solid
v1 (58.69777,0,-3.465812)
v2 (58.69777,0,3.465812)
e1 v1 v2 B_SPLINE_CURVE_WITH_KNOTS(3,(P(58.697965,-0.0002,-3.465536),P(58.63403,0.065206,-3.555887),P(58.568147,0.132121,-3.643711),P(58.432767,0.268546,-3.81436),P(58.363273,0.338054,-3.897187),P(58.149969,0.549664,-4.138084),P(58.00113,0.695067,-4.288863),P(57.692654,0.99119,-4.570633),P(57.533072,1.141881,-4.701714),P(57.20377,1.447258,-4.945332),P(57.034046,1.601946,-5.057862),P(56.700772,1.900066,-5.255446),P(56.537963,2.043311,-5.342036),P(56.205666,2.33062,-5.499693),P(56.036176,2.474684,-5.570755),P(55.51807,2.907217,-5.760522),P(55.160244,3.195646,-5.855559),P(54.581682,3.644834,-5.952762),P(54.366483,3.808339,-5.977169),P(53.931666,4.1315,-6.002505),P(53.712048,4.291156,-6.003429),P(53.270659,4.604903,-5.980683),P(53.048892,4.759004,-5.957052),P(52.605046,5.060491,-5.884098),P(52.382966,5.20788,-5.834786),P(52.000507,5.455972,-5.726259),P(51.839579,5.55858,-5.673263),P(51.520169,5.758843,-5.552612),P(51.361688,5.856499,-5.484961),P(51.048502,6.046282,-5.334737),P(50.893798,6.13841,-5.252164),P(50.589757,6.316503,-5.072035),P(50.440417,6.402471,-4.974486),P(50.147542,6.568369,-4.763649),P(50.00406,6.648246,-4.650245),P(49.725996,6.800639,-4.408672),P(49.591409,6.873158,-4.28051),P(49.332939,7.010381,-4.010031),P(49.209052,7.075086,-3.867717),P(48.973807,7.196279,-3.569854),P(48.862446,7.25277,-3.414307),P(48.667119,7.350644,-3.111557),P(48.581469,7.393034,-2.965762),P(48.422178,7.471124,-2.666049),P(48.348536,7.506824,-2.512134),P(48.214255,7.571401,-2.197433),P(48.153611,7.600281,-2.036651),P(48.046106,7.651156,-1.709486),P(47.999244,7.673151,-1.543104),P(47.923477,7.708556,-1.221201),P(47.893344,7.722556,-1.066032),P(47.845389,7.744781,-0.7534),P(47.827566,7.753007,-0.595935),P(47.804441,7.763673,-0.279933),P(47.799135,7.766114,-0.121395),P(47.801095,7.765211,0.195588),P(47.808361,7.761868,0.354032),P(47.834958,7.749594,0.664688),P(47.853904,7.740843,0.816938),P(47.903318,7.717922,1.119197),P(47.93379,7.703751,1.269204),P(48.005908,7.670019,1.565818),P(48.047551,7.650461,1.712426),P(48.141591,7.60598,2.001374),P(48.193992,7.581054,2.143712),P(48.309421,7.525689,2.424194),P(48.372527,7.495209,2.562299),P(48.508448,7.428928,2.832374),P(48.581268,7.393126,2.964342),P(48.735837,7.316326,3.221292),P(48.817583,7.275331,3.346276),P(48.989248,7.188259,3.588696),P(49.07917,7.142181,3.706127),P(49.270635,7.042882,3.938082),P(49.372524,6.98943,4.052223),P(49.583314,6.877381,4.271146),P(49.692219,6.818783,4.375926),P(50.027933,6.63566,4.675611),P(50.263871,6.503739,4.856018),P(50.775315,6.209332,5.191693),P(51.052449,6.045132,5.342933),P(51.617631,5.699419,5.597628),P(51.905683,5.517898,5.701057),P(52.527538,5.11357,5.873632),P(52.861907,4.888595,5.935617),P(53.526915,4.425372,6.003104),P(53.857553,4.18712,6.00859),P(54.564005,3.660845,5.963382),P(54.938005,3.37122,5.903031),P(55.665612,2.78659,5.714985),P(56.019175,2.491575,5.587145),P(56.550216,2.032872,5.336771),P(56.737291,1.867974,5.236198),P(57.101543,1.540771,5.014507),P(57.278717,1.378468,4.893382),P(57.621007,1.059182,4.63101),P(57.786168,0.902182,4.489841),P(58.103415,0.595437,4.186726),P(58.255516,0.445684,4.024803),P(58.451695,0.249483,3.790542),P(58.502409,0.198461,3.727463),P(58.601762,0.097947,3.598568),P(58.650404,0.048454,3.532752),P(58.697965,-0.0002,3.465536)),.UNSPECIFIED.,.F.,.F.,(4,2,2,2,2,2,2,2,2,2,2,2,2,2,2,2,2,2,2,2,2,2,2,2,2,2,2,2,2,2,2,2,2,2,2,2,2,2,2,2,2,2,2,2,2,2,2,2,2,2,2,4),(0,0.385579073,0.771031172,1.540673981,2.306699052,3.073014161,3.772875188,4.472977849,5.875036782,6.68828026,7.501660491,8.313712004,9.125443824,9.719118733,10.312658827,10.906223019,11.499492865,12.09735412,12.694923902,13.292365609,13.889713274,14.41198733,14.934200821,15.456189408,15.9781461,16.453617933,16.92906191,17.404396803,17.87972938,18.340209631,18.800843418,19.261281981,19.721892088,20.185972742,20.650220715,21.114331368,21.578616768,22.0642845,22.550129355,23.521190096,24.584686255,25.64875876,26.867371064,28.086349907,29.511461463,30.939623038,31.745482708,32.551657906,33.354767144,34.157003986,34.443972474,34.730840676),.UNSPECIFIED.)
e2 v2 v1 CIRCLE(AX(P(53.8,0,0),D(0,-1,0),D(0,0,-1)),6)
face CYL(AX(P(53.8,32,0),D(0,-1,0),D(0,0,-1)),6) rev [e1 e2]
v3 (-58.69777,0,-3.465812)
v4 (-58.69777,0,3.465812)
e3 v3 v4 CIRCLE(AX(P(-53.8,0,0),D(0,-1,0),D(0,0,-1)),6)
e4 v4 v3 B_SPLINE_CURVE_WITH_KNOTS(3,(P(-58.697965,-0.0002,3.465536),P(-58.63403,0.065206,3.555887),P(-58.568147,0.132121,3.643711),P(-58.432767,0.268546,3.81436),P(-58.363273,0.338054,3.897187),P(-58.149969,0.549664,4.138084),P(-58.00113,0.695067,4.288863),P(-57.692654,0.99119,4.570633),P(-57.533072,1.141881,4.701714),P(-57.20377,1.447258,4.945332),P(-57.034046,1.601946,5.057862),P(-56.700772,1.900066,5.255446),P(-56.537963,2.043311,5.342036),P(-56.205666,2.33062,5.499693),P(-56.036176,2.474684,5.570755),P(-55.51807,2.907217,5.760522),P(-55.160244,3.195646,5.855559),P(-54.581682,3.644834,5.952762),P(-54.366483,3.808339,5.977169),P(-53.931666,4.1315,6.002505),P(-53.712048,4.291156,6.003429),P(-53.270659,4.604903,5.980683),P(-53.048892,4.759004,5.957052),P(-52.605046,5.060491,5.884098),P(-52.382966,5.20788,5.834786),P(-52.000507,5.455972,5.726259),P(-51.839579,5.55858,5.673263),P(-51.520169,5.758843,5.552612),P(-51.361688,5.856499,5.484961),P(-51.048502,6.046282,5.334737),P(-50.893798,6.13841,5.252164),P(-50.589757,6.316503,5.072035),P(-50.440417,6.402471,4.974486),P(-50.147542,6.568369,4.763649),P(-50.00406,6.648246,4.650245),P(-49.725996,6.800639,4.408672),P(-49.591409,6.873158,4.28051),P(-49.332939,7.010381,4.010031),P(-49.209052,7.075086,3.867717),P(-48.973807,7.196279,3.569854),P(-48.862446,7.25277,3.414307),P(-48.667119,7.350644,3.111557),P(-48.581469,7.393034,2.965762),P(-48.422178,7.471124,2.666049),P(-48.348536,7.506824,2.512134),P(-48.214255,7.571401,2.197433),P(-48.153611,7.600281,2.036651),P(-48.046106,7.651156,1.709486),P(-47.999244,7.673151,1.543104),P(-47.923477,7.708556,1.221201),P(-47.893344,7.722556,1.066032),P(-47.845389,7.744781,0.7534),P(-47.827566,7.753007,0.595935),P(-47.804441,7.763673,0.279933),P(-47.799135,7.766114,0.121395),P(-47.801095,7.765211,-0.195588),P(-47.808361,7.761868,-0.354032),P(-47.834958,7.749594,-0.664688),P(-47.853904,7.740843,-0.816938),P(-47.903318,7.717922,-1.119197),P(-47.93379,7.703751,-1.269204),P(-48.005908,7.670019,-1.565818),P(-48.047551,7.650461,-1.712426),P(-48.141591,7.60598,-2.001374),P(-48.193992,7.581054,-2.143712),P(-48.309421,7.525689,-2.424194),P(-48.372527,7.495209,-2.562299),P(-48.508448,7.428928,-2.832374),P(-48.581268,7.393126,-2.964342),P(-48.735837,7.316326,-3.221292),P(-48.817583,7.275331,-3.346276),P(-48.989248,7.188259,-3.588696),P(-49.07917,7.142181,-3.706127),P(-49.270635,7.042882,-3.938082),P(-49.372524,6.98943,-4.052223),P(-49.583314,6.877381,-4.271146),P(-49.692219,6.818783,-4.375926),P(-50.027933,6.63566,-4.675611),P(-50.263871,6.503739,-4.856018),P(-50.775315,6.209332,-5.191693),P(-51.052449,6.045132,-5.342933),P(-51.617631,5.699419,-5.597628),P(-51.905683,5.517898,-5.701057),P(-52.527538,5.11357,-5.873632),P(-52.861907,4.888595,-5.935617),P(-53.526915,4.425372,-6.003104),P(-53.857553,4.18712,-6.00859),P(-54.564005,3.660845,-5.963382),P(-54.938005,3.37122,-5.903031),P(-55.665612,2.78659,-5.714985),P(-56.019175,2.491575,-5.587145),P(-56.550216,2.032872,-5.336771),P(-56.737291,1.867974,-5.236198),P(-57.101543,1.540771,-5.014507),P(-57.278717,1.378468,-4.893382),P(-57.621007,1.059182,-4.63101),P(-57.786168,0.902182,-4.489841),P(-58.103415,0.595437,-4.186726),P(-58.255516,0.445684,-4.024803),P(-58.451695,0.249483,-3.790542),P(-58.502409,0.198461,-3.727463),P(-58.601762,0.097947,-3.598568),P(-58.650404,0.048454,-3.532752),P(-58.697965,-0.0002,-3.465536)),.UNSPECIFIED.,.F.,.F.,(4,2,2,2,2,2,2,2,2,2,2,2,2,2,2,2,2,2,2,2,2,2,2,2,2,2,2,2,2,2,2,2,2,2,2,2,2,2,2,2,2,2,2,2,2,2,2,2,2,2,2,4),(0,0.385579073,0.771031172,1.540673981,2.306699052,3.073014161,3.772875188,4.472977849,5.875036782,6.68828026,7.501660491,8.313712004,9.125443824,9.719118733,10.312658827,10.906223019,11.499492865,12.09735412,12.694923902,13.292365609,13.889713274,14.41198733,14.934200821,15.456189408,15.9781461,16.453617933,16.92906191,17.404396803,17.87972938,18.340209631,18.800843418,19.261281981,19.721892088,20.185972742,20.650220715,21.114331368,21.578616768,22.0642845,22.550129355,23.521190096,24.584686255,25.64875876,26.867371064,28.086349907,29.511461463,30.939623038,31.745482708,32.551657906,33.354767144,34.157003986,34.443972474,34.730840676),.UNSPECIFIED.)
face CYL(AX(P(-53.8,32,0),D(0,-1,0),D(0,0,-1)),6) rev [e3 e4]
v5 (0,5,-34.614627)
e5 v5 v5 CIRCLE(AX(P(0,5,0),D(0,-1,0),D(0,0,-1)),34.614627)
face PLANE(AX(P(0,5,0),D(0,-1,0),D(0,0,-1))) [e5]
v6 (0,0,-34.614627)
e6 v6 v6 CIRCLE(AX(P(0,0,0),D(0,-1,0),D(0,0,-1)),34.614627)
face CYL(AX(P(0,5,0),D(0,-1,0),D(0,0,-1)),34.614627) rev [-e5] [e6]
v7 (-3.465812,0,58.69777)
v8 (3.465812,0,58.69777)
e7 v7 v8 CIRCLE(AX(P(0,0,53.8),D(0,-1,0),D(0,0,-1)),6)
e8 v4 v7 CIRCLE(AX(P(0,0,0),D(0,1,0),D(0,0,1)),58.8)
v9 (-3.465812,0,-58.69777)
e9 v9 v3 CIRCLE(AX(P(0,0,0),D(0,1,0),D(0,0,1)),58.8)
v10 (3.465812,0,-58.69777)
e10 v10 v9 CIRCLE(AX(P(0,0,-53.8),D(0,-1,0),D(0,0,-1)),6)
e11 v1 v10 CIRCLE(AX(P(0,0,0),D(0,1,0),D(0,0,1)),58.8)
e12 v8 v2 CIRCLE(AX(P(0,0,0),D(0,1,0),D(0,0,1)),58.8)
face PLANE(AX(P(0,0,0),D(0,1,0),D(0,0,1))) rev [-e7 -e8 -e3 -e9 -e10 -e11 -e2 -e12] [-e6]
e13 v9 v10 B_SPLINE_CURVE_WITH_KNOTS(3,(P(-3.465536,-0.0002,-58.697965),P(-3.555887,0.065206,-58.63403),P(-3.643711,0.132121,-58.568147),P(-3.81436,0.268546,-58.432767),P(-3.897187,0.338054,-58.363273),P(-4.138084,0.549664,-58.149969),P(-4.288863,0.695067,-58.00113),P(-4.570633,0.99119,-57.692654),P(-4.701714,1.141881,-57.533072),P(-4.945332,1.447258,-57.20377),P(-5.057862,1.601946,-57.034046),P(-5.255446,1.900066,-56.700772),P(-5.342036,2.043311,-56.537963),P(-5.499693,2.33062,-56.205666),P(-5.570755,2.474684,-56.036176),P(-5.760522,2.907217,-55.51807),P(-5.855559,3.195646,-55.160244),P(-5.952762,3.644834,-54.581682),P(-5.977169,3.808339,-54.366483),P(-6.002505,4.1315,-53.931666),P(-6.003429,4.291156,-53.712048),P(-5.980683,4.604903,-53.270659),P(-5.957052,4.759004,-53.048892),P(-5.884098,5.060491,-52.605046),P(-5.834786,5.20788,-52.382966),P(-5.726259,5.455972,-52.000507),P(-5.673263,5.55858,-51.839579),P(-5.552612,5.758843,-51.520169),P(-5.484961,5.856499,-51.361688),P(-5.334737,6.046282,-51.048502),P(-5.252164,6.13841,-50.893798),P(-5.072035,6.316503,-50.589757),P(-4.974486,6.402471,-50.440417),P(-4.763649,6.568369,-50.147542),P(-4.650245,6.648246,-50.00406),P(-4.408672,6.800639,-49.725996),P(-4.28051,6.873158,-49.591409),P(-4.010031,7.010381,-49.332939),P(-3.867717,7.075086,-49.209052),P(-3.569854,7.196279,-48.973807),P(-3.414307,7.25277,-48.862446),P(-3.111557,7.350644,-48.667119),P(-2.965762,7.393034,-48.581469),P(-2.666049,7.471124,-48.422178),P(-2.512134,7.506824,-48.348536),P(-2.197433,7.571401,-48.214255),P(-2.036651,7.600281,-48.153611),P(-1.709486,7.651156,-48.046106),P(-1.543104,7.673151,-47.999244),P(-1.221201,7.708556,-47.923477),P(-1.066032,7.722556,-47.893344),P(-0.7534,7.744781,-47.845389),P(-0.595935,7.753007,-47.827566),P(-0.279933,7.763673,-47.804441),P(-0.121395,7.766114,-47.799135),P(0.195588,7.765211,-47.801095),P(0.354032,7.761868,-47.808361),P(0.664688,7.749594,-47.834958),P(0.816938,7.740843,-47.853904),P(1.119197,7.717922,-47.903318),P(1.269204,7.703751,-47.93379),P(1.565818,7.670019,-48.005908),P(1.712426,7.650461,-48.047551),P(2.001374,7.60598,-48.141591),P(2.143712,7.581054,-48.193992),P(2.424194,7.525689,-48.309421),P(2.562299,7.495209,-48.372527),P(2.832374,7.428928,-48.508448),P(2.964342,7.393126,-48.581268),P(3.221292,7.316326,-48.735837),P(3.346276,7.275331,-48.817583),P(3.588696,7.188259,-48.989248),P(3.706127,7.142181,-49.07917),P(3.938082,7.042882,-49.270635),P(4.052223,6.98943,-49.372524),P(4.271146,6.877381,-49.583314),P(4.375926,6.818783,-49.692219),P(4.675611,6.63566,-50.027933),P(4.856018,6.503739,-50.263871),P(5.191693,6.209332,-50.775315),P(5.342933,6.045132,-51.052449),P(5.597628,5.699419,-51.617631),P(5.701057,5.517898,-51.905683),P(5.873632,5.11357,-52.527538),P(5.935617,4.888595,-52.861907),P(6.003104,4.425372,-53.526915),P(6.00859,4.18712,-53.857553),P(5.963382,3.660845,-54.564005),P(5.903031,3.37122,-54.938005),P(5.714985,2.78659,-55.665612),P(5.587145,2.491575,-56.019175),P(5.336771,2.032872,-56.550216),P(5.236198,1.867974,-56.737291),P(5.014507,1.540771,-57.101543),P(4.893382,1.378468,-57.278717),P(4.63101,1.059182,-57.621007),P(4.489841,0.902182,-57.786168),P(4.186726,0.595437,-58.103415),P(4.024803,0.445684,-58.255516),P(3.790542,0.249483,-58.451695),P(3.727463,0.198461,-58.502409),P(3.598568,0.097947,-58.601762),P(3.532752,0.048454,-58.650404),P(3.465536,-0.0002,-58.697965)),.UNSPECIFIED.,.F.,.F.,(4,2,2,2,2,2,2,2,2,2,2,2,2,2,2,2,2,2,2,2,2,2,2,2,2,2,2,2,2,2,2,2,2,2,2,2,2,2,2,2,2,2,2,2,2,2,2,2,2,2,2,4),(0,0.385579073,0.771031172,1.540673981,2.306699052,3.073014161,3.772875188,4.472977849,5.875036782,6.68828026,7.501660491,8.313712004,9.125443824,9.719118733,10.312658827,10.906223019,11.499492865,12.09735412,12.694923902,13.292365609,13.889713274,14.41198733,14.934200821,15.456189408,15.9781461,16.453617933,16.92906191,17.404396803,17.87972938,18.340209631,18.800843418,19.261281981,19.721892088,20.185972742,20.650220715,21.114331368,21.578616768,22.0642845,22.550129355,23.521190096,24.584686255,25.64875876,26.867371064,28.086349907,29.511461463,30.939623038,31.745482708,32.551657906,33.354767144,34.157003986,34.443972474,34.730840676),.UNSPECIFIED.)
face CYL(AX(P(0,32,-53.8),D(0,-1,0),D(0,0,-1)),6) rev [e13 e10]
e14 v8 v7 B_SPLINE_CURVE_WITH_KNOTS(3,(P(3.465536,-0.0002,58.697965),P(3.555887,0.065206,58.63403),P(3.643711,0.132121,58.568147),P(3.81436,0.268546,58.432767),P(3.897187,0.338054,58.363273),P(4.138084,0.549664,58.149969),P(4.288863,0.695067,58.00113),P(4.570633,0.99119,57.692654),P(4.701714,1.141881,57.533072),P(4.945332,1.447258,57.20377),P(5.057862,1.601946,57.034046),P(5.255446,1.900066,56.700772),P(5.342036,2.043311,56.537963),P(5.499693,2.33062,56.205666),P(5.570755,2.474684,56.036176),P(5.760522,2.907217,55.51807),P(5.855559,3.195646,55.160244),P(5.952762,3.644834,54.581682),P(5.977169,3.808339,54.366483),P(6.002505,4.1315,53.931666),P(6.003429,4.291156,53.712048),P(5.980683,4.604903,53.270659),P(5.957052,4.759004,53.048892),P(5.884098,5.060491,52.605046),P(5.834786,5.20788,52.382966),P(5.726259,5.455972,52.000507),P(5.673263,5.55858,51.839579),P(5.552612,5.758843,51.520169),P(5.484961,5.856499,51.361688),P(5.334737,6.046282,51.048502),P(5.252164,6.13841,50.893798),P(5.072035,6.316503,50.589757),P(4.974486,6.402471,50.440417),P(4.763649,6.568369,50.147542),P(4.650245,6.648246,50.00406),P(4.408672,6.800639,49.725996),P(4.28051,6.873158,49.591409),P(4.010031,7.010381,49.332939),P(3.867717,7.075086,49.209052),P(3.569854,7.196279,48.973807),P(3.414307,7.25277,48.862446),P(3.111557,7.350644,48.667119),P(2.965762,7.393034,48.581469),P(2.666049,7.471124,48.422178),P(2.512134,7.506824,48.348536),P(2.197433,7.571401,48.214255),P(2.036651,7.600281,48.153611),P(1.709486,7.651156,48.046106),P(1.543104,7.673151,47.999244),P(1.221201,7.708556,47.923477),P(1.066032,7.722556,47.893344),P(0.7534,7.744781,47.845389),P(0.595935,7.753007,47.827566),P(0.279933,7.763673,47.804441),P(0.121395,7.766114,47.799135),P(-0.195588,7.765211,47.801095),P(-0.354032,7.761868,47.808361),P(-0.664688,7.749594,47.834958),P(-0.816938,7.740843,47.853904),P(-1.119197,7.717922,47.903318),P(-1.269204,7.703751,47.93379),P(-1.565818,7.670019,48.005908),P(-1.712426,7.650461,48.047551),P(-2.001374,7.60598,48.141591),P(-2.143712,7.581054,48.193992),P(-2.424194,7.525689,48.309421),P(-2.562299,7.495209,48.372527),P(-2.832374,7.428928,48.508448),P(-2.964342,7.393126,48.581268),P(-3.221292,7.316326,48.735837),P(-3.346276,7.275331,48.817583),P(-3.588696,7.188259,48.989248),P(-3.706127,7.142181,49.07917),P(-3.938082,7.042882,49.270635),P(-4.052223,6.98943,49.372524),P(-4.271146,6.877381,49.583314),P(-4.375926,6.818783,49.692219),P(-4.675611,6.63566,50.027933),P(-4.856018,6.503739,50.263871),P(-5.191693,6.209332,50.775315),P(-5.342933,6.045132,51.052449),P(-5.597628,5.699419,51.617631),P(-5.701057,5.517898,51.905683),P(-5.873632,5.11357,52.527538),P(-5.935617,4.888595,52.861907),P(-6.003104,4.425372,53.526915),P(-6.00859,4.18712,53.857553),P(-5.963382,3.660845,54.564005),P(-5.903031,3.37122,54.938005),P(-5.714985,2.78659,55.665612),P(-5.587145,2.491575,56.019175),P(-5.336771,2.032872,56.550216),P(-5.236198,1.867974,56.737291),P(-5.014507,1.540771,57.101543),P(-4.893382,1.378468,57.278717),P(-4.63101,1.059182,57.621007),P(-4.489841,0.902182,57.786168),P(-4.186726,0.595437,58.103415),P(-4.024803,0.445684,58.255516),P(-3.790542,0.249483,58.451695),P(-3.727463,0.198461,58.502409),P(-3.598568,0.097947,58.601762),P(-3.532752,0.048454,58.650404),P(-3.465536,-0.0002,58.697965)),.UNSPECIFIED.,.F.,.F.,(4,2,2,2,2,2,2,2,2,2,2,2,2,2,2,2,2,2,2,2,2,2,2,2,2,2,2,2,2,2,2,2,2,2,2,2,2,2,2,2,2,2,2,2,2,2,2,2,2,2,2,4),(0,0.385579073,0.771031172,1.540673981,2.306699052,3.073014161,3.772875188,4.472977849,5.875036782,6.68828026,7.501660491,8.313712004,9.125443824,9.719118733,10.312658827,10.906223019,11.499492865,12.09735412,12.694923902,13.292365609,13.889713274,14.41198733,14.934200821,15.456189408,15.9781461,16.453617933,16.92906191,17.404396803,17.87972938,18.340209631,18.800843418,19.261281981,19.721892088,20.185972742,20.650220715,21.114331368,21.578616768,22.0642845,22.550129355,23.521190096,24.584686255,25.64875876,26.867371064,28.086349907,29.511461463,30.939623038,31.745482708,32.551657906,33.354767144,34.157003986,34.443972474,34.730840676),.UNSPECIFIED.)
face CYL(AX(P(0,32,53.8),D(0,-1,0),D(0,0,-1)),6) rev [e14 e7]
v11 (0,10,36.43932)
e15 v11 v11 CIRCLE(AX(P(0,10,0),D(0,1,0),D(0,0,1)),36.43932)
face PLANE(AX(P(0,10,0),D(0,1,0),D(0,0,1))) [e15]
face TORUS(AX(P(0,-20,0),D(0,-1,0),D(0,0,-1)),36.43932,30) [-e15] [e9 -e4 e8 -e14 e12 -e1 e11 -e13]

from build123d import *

# Parameters (mm, degrees)
CROQUIS1_R              = 58.8
SALIENTE_EXTRUIR1_DEPTH = 10
REDONDEO1_R             = 30
CROQUIS2_R              = 34.614627086
CORTAR_EXTRUIR1_DEPTH   = 5
CROQUIS3_R              = 6
CORTAR_EXTRUIR2_DEPTH   = 32


with BuildPart() as part:
    # Croquis1 → Saliente-Extruir1 (new body)
    with BuildSketch(Plane(origin=(0, 0, 0), x_dir=(1, 0, 0), z_dir=(0, 1, 0))):
        with Locations(Location((0, 0, 0), (0, 0, 270))):
            Circle(CROQUIS1_R)
    extrude(amount=SALIENTE_EXTRUIR1_DEPTH)

    # Redondeo1
    # the kernel refuses this fillet: 30 mm, written as the material it takes off along each edge
    with BuildSketch(Plane(origin=(0, 10, 0), x_dir=(0, 0, 1), z_dir=(-1, 0, 0))) as redondeo1_piece_1:
        with BuildLine():
            CenterArc((36.439320225, -30), REDONDEO1_R, 41.810314896, 48.189685104)
            Line((36.439320225, 0), (36.439320225, 0.6))
            Line((36.439320225, 0.6), (58.8, 0.6))
            Line((58.8, 0.6), (59.4, 0))
            ThreePointArc((59.4, 0), (59.4, -5), (59.247213595, -9.6))
            Line((59.247213595, -9.6), (58.8, -10))
        make_face()
    revolve(axis=Axis((0, 10, 0), (0, 1, 0)), mode=Mode.SUBTRACT)

    # Croquis2 → Cortar-Extruir1 (cut)
    with BuildSketch(Plane(origin=(0, 0, 0), x_dir=(-1, 0, 0), z_dir=(0, -1, 0))):
        with Locations(Location((0, 0, 0), (0, 0, 90))):
            Circle(CROQUIS2_R)
    extrude(amount=-CORTAR_EXTRUIR1_DEPTH, mode=Mode.SUBTRACT)

    # Croquis3 → Cortar-Extruir2 (cut)
    with BuildSketch(Plane(origin=(0, 0, 0), x_dir=(-1, 0, 0), z_dir=(0, -1, 0))):
        with Locations((0, -53.8)):
            Circle(CROQUIS3_R)
        with Locations((-53.8, 0)):
            Circle(CROQUIS3_R)
        with Locations((0, 53.8)):
            Circle(CROQUIS3_R)
        with Locations((53.8, 0)):
            Circle(CROQUIS3_R)
    extrude(amount=-CORTAR_EXTRUIR2_DEPTH, mode=Mode.SUBTRACT)


solid = part.part
